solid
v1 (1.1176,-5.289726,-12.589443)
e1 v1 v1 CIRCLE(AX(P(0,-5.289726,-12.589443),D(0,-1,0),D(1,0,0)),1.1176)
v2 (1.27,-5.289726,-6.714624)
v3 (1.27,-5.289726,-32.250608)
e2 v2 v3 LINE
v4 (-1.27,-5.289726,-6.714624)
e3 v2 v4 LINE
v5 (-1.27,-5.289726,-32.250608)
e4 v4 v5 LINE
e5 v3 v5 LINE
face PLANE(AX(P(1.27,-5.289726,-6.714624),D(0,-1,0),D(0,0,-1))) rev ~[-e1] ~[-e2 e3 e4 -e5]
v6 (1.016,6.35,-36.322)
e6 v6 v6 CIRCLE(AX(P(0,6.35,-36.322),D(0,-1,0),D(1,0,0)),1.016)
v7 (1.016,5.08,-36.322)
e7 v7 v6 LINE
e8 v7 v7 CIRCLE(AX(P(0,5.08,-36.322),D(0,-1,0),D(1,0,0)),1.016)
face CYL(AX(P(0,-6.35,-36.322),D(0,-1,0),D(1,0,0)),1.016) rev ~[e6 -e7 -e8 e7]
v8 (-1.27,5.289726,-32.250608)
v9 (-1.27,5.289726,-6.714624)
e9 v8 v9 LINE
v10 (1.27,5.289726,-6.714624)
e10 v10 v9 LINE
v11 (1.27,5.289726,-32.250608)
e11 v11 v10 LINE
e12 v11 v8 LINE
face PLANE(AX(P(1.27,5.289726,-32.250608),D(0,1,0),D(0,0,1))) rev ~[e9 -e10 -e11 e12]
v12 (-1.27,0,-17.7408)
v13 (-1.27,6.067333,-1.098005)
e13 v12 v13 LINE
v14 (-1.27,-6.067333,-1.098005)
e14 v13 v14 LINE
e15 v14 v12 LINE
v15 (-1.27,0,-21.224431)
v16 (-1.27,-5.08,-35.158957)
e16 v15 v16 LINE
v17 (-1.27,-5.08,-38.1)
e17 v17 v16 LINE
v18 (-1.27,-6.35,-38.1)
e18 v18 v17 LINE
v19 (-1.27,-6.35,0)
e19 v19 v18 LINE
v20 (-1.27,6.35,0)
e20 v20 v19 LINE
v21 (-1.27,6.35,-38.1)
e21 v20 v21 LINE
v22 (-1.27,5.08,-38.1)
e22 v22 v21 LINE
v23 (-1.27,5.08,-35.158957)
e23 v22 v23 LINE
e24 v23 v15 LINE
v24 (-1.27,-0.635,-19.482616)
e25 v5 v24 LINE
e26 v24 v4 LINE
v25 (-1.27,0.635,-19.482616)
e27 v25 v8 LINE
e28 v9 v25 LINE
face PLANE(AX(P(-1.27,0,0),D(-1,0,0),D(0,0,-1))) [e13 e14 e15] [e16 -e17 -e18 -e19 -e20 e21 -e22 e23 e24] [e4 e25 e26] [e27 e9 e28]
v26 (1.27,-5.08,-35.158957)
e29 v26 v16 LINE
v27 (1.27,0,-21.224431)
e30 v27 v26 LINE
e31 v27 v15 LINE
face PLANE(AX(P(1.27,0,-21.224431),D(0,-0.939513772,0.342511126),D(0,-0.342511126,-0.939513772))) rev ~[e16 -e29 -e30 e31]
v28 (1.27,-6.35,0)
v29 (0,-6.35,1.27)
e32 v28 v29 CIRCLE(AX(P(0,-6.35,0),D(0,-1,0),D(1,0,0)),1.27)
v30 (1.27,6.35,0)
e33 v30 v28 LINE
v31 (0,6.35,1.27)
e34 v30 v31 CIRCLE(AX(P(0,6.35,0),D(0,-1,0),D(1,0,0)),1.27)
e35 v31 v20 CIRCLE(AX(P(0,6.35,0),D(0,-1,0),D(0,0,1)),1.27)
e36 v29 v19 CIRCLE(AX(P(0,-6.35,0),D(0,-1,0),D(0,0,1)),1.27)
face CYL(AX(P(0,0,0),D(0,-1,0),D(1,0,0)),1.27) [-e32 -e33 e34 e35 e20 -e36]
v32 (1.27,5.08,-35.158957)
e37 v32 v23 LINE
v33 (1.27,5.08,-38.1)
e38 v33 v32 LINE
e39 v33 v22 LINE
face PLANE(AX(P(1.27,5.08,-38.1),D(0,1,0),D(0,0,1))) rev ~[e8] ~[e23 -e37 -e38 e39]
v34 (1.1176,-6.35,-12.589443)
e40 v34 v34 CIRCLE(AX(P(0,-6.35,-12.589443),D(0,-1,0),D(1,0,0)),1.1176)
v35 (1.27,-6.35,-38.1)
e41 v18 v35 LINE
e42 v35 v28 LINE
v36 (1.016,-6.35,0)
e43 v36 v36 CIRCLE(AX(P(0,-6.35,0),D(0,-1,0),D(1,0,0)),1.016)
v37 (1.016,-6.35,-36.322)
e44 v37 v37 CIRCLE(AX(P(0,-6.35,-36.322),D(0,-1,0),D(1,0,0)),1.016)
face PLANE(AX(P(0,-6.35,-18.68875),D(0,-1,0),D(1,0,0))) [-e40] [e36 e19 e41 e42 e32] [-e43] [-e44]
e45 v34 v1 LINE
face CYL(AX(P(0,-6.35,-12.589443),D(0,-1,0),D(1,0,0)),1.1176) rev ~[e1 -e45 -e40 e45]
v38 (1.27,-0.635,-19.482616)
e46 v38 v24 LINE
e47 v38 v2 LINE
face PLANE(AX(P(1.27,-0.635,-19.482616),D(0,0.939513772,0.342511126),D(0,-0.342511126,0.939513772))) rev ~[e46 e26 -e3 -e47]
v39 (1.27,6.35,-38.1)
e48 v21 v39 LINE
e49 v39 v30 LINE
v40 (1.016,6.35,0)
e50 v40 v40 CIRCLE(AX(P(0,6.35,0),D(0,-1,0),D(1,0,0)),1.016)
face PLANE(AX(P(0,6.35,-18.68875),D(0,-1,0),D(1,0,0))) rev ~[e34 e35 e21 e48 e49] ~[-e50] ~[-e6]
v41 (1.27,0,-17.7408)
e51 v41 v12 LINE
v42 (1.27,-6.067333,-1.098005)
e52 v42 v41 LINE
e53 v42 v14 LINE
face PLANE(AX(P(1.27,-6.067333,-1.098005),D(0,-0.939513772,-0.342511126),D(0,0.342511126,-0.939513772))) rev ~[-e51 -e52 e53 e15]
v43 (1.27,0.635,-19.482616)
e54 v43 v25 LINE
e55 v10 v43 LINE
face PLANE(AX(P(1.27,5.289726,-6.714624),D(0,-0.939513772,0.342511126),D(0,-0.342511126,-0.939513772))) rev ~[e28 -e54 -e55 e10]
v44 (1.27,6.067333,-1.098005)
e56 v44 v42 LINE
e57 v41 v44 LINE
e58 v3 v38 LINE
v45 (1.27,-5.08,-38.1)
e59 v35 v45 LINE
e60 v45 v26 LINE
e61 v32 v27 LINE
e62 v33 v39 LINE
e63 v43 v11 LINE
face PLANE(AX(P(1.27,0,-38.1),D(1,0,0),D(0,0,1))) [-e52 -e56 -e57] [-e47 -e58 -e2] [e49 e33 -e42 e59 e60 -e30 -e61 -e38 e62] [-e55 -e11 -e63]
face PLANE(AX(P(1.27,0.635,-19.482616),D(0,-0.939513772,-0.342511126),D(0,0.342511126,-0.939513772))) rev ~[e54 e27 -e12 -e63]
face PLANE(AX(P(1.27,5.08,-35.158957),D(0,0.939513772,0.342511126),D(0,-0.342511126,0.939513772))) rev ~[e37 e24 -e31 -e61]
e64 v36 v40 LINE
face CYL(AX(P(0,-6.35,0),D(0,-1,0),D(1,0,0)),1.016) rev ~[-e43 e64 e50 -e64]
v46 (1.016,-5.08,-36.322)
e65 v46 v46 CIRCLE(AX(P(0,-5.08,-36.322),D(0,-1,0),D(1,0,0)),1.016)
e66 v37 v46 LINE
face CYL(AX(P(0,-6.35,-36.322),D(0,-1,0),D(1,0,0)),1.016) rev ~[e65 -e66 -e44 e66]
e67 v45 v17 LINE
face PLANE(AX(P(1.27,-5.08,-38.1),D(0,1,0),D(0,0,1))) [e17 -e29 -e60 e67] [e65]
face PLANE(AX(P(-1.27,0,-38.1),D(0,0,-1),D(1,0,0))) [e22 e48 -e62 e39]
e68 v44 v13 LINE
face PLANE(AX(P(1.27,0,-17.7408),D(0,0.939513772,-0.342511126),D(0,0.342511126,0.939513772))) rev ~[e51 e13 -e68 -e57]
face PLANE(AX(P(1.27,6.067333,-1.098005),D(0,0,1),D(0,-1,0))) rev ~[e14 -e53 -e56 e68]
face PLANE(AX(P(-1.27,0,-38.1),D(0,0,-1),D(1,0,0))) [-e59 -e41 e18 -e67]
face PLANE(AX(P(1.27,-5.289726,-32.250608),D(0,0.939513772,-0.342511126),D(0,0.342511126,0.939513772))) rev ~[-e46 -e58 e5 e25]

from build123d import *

# Parameters (mm, degrees)
F1_DEPTH = 6.35
F3_DEPTH = 2.54
F4_W     = 10.16
F4_H     = 2.9410431877
F5_DEPTH = 2.54
F6_R     = 1.016
F7_DEPTH = 12.7
F8_R     = 1.1176
F9_DEPTH = 2.54


# Not quite as in the source:
# - a feature names something its author has since deleted; it is built from what else it names


with BuildPart() as f1:
    # F0 (on Front) → F1 (new body, symmetric)
    with BuildSketch(Plane.XZ):
        with BuildLine():
            Line((1.27, -38.1), (1.27, 0))
            ThreePointArc((1.27, 0), (0.8980256121, 0.8980256121), (0, 1.27))
            ThreePointArc((0, 1.27), (-0.8980256121, 0.8980256121), (-1.27, 0))
            Line((-1.27, 0), (-1.27, -38.1))
            Line((-1.27, -38.1), (1.27, -38.1))
        make_face()
    extrude(amount=F1_DEPTH, both=True)

    # F2 (on face) → F3 (cut)
    with BuildSketch(Plane.YZ.offset(1.27)):
        Polygon((0.635, -19.4826158311), (5.2897260698, -32.2506076148), (5.2897260698, -6.7146240474), align=None)
        Polygon((0, -35.1589568123), (5.08, -35.1589568123), (0, -21.2244314957), align=None)
        Polygon((0, -1.0980047432), (0, -17.7408001665), (6.067332674, -1.0980047432), align=None)
        Polygon((-6.067332674, -1.0980047432), (0, -17.7408001665), (0, -1.0980047432), align=None)
        Polygon((0, -35.1589568123), (0, -21.2244314957), (-5.08, -35.1589568123), align=None)
        Polygon((-5.2897260698, -32.2506076148), (-0.635, -19.4826158311), (-5.2897260698, -6.7146240474), align=None)
    extrude(amount=-F3_DEPTH, mode=Mode.SUBTRACT)

    # F4 (on face) → F5 (cut)
    with BuildSketch(Plane.YZ.offset(1.27)):
        with Locations((0, -36.6294784061)):
            Rectangle(F4_W, F4_H)
    extrude(amount=-F5_DEPTH, mode=Mode.SUBTRACT)

    # F6 (on face) → F7 (cut)
    with BuildSketch(Plane.XZ.offset(6.35)):
        with Locations((0, -36.322)):
            Circle(F6_R)
        Circle(F6_R)
    extrude(amount=-F7_DEPTH, mode=Mode.SUBTRACT)

    # F8 (on face) → F9 (cut)
    with BuildSketch(Plane.XZ.offset(6.35)):
        with Locations((0, -12.589443475)):
            Circle(F8_R)
    extrude(amount=-F9_DEPTH, mode=Mode.SUBTRACT)


solid = f1.part
